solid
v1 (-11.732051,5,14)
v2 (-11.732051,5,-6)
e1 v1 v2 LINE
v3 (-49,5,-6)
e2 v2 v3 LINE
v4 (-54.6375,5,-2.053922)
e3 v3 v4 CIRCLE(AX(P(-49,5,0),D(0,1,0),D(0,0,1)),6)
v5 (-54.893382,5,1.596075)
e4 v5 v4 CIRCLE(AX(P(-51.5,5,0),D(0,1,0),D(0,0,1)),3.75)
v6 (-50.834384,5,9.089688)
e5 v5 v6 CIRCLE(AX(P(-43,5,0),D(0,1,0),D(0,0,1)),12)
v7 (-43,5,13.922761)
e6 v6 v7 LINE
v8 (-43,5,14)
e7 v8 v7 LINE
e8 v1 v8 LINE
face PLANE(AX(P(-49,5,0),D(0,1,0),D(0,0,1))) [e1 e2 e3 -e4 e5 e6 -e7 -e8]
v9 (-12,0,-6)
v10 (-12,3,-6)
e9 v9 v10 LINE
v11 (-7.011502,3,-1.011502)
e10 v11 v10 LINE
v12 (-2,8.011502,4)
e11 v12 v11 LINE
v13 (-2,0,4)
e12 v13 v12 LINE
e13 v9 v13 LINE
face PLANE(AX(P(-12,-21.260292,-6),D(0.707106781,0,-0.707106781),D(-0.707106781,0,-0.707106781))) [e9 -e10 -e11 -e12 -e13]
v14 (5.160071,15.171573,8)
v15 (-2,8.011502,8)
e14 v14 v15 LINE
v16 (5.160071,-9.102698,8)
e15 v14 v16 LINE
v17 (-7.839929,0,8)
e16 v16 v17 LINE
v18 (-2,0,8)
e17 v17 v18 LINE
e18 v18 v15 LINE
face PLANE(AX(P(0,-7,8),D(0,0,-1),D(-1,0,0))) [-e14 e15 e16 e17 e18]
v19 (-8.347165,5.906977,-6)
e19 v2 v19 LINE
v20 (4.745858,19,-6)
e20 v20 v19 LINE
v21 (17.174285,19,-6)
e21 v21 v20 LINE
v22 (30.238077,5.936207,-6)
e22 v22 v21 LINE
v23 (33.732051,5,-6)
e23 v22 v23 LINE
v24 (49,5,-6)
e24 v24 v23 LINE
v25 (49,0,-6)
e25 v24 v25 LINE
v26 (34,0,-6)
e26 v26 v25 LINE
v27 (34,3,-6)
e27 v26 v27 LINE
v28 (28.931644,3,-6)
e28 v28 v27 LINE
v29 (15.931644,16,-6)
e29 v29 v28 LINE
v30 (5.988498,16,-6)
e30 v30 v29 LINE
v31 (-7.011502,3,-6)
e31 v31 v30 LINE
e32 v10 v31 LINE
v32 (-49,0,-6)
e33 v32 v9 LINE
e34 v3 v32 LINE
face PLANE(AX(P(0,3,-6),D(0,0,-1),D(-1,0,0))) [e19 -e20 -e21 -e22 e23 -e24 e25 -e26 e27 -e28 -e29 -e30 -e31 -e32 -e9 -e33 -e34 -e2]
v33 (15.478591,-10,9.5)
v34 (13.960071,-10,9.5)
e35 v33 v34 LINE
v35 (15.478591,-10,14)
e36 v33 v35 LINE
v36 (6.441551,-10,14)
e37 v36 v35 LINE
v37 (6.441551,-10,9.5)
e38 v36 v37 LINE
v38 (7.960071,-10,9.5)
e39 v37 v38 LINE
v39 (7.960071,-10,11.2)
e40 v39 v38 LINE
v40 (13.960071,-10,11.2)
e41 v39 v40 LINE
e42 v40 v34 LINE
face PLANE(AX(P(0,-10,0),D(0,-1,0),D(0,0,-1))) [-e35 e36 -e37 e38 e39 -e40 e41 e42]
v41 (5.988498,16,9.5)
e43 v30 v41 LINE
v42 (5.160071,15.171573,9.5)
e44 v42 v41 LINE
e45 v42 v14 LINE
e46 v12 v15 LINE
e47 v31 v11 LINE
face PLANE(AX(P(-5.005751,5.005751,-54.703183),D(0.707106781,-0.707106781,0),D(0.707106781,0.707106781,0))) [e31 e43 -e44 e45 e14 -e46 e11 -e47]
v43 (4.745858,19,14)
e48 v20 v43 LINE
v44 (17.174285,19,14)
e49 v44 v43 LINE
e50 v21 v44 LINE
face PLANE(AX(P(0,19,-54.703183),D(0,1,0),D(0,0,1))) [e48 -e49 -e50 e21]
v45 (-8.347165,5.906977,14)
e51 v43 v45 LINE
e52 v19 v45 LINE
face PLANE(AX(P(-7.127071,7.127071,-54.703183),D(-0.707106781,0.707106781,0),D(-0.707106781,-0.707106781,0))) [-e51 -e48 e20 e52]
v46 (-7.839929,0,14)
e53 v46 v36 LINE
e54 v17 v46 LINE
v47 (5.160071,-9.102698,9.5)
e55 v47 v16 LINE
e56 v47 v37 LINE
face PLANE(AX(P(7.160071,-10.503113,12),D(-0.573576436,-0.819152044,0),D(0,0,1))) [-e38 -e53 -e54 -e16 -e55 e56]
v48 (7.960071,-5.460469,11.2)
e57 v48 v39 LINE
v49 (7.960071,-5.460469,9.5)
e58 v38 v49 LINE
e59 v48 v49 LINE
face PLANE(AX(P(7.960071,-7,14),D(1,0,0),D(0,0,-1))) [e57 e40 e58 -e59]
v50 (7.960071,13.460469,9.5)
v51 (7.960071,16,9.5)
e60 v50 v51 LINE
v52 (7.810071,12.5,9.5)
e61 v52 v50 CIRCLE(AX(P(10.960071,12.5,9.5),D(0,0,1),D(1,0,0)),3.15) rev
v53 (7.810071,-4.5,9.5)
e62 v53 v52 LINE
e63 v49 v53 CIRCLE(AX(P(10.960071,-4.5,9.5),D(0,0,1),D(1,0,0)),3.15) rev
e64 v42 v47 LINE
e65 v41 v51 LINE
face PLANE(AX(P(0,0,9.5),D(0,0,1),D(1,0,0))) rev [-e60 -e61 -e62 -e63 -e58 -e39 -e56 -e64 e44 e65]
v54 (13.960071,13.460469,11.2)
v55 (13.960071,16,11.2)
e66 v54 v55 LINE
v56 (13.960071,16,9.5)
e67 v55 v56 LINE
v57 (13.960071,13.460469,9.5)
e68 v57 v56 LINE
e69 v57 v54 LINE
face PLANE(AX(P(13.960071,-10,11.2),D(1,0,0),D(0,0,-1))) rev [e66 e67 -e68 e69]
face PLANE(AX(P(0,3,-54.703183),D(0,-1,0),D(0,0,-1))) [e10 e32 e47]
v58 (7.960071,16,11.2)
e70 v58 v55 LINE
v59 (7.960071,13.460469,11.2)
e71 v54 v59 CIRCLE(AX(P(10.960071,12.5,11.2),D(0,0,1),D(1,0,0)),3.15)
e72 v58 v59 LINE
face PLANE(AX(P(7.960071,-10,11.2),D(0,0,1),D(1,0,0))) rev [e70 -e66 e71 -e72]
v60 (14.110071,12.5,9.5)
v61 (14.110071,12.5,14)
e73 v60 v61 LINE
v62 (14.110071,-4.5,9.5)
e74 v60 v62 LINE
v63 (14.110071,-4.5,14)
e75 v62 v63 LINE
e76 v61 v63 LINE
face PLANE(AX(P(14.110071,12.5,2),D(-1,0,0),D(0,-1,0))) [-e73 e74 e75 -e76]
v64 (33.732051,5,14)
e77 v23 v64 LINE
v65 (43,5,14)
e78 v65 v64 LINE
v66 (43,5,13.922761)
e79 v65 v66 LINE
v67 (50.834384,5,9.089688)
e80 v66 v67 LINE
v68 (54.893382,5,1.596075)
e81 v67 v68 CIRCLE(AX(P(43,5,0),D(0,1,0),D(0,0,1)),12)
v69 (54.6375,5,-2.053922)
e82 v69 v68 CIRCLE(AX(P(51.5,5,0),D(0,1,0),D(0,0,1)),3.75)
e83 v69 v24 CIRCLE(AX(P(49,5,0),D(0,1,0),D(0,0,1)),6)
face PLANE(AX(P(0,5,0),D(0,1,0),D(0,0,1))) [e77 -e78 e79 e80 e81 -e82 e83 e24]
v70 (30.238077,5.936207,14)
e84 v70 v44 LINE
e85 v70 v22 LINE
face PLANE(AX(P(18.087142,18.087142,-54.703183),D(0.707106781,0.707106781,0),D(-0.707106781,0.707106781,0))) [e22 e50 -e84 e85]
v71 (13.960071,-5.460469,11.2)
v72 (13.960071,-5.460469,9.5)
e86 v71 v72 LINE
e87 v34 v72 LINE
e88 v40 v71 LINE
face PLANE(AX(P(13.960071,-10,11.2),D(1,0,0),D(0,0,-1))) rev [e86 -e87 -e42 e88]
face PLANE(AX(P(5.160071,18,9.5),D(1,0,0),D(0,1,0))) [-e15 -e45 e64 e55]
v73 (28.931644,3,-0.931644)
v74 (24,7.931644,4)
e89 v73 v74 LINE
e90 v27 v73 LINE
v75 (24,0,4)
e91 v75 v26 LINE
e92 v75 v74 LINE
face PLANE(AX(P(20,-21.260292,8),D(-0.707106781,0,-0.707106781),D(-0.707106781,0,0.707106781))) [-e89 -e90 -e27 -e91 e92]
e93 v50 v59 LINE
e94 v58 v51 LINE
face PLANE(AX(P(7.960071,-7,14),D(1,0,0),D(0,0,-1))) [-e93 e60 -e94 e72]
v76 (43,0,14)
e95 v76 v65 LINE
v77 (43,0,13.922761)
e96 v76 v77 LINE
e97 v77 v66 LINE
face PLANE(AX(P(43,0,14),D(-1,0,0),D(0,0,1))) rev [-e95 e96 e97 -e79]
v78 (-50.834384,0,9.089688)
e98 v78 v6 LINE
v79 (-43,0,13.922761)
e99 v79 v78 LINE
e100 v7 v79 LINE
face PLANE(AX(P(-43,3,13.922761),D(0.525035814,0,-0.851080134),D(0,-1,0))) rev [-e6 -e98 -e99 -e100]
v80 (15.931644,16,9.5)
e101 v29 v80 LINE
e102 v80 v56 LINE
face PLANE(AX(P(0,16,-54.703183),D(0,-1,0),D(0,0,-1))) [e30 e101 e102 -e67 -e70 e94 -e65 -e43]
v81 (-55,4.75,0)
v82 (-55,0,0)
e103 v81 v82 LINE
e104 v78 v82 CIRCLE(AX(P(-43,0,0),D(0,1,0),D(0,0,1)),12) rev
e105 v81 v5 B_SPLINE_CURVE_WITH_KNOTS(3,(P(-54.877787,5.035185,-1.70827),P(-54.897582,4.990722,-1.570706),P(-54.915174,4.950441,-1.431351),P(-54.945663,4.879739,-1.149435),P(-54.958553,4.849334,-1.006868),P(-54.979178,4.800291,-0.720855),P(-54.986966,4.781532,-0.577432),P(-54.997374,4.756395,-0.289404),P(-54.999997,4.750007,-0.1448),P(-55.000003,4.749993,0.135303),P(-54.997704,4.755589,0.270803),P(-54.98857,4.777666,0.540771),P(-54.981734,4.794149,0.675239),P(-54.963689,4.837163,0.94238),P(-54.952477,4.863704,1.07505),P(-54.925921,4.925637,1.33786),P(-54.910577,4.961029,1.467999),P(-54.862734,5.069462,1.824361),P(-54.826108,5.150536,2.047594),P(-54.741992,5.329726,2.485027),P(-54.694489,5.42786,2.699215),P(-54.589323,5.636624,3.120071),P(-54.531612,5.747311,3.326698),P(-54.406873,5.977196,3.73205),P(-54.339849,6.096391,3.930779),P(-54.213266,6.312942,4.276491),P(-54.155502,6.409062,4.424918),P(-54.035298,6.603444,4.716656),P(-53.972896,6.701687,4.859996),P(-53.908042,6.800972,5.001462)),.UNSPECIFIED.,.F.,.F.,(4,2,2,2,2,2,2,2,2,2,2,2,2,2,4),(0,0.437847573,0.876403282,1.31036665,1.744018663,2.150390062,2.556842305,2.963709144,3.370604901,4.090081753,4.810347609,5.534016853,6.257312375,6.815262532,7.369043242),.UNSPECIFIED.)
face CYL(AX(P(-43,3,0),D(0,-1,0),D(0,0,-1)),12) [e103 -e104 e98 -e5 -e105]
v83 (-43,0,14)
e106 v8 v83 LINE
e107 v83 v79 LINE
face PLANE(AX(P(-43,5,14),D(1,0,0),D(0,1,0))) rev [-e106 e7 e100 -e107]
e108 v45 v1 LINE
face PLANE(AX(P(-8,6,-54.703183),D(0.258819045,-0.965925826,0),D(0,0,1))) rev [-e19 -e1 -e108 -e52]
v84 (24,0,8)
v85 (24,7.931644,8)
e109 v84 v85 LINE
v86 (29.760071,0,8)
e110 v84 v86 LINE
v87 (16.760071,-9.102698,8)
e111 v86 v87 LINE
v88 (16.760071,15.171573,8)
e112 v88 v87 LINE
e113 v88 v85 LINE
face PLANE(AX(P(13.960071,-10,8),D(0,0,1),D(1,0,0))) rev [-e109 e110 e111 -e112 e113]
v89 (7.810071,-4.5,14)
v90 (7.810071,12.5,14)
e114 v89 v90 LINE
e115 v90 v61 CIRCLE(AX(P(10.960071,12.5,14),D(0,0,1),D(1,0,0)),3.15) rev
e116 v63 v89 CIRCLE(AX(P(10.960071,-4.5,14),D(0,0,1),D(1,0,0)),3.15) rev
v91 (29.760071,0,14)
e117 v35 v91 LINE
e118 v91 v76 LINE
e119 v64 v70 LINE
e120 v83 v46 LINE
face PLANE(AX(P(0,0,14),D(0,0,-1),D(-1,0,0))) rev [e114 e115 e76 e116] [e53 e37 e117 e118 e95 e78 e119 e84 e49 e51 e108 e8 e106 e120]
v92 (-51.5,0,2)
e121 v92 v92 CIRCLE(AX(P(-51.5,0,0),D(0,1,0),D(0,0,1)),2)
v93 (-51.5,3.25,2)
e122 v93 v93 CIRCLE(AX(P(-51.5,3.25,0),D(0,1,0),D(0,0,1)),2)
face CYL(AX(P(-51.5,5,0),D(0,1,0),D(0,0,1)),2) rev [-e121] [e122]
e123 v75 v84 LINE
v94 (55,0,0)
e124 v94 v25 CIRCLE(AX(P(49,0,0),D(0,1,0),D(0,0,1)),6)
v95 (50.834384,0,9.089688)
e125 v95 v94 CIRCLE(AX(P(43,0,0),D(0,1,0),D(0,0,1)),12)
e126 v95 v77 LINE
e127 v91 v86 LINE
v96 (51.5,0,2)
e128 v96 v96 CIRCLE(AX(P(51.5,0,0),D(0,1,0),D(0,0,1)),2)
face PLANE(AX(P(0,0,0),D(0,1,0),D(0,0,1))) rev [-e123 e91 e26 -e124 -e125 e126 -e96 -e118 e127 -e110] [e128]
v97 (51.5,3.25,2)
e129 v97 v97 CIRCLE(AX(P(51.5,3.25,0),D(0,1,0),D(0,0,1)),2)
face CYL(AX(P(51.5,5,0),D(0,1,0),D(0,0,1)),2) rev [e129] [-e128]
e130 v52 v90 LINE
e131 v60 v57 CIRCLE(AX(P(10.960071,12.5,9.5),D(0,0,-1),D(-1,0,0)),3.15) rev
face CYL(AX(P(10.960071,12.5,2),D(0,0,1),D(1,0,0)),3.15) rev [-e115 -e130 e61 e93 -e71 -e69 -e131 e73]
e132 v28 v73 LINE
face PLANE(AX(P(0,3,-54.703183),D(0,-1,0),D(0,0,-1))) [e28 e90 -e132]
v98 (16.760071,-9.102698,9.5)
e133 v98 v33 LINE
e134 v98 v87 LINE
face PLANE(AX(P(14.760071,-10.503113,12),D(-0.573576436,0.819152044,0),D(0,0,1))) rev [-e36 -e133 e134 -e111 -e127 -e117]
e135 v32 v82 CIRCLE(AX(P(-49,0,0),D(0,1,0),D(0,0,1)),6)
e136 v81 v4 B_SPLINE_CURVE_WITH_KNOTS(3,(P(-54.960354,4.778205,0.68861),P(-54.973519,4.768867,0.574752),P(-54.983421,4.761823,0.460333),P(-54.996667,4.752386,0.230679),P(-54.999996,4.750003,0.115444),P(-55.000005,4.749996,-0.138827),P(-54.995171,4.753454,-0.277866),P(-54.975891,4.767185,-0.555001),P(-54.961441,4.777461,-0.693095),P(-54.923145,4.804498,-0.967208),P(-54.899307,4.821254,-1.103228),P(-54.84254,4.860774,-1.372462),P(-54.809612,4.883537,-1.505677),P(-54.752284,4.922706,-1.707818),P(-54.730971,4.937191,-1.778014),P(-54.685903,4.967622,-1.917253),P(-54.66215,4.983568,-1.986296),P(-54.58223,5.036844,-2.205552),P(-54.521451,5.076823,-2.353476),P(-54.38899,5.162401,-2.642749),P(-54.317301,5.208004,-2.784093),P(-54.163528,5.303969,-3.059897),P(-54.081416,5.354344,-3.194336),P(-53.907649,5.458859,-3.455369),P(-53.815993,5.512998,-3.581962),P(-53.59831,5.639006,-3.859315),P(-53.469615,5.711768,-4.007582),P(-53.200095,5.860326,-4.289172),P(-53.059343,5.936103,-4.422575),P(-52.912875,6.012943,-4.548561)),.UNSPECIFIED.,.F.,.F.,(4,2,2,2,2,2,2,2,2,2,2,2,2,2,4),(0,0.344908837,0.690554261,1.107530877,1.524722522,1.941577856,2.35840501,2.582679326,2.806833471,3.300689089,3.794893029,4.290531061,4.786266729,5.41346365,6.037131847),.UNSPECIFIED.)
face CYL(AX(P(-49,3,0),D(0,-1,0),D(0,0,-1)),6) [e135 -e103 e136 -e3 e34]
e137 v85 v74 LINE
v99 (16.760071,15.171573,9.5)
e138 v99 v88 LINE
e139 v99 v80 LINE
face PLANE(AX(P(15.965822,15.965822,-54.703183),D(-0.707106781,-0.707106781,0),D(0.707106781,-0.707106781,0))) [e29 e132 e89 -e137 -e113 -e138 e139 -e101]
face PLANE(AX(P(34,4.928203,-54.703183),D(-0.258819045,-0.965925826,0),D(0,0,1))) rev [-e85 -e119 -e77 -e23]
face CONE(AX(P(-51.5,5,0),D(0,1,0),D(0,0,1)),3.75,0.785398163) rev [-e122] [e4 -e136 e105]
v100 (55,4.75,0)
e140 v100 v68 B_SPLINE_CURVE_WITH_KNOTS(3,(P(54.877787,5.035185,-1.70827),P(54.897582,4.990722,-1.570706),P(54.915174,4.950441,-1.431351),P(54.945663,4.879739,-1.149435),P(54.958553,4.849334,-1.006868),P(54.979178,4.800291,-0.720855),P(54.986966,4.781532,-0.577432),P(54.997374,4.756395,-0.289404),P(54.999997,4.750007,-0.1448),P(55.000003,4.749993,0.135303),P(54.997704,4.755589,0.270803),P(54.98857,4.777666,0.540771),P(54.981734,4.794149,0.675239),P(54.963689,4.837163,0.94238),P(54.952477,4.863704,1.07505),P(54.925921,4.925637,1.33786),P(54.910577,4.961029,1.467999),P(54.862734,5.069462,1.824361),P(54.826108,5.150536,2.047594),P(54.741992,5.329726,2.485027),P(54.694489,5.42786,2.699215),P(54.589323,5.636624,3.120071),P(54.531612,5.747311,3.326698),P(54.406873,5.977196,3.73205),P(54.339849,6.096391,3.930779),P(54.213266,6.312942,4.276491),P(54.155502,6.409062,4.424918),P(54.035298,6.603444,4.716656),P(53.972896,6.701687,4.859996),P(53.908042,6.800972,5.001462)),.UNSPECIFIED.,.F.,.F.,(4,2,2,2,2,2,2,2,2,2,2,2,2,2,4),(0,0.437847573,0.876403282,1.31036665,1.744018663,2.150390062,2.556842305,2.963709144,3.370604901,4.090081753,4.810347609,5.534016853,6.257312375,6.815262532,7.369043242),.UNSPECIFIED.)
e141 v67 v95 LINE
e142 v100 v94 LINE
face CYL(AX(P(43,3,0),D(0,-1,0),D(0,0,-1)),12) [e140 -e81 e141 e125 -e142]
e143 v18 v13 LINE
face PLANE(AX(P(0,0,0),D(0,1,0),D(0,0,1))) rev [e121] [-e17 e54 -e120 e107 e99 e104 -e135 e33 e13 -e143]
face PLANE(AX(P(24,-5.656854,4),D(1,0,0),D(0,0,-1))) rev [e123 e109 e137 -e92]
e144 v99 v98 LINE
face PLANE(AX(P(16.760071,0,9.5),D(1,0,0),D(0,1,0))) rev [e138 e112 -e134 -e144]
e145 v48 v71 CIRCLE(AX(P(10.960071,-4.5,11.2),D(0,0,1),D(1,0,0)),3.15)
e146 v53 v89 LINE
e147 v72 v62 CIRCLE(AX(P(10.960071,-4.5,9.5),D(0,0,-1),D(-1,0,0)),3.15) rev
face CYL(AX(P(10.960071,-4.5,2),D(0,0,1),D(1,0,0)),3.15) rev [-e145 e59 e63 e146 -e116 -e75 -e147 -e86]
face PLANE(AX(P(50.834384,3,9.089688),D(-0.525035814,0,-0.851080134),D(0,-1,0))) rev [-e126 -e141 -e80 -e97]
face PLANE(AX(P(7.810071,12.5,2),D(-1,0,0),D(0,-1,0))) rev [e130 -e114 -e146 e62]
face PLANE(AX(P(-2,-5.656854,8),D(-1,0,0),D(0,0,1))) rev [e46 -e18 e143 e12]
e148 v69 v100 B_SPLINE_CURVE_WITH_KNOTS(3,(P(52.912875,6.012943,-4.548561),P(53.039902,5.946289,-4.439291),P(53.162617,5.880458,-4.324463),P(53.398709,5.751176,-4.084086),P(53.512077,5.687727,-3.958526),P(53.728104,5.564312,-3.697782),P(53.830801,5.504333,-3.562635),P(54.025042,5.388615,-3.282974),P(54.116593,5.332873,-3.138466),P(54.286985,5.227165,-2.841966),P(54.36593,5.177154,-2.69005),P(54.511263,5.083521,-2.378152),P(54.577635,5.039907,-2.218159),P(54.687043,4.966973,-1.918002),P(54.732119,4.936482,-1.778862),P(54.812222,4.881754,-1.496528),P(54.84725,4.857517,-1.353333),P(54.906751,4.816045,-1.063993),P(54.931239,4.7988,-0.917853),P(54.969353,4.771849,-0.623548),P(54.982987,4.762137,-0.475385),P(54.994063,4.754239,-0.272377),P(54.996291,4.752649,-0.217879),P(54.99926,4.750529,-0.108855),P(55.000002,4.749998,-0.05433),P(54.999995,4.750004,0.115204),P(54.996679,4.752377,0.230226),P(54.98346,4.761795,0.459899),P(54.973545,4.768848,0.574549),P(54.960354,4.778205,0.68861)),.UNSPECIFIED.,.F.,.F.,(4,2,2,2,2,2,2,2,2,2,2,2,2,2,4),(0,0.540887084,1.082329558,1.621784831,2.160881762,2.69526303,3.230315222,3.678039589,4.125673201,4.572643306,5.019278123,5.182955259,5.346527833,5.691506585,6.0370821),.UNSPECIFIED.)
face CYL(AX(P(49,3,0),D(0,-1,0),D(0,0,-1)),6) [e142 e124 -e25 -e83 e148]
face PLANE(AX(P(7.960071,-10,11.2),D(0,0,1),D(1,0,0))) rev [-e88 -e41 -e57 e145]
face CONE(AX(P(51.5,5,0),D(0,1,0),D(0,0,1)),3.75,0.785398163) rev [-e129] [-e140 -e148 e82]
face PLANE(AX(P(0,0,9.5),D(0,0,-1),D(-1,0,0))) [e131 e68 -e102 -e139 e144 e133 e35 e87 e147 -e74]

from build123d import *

# Parameters (mm, degrees)
BOSS_EXTRUDE1_DEPTH           = 3
CUT_EXTRUDE1_DEPTH            = 10
CUT_EXTRUDE3_START            = 8
SKETCH8_W                     = 6
SKETCH8_H                     = 3
CUT_EXTRUDE3_DEPTH            = 6
BOSS_EXTRUDE4_START           = 18
BOSS_EXTRUDE4_DEPTH           = 28
BOSS_EXTRUDE5_DEPTH           = 3
CUT_EXTRUDE4_DEPTH            = 3
CUT_EXTRUDE5_DEPTH            = 10
SKETCH18_R                    = 1.5
BOSS_EXTRUDE9_DEPTH           = 2
CHAMFER1_SIZE                 = 15
CHAMFER2_SIZE                 = 15
CHAMFER2_SIZE_2               = 10.503113073
CUT_EXTRUDE6_DEPTH            = 5
BOSS_EXTRUDE8_DEPTH           = 2
CHAMFER3_DEPTH                = 6
CHAMFER3_2_DEPTH              = 5
CSK_FOR_M4_SFHCS1_D           = 4
CSK_FOR_M4_SFHCS1_DEPTH       = 30.798278762
CSK_FOR_M4_SFHCS1_CSINK_D     = 7.5
CSK_FOR_M4_SFHCS1_CSINK_ANGLE = 90
CSK_FOR_M4_SFHCS1_TIP         = 1.201721238
CUT_EXTRUDE7_DEPTH            = 1.5
BOSS_EXTRUDE10_START          = -6
BOSS_EXTRUDE10_DEPTH          = 20
CHAMFER4_SIZE                 = 1.07179677
CHAMFER4_SIZE_2               = 4


with BuildPart() as part:
    # Sketch1 → Boss-Extrude1 (new body)
    with BuildSketch(Plane(origin=(0, 0, 0), x_dir=(1, 0, 0), z_dir=(0, 1, 0))):
        with BuildLine():
            ThreePointArc((-49, -6), (-53.242640687, -4.242640687), (-55, 0))
            ThreePointArc((-55, 0), (-51.485281374, -8.485281374), (-43, -12))
            Line((-43, -12), (43, -12))
            ThreePointArc((43, -12), (51.485281374, -8.485281374), (55, 0))
            ThreePointArc((55, 0), (53.242640687, -4.242640687), (49, -6))
            Line((49, -6), (-49, -6))
        make_face()
        with BuildLine():
            Line((-53, 0), (-55, 0))
            ThreePointArc((-55, 0), (-53.242640687, -4.242640687), (-49, -6))
            Line((-49, -6), (49, -6))
            ThreePointArc((49, -6), (53.242640687, -4.242640687), (55, 0))
            Line((55, 0), (53, 0))
            ThreePointArc((53, 0), (51.5, -1.5), (50, 0))
            Line((50, 0), (-50, 0))
            ThreePointArc((-50, 0), (-51.5, -1.5), (-53, 0))
        make_face()
        with BuildLine():
            Line((49, 6), (-49, 6))
            ThreePointArc((-49, 6), (-53.242640687, 4.242640687), (-55, 0))
            Line((-55, 0), (-53, 0))
            ThreePointArc((-53, 0), (-51.5, 1.5), (-50, 0))
            Line((-50, 0), (50, 0))
            ThreePointArc((50, 0), (51.5, 1.5), (53, 0))
            Line((53, 0), (55, 0))
            ThreePointArc((55, 0), (53.242640687, 4.242640687), (49, 6))
        make_face()
    extrude(amount=BOSS_EXTRUDE1_DEPTH)

    # Sketch2 → Cut-Extrude1 (cut)
    with BuildSketch(Plane(origin=(0, 3, 0), x_dir=(1, 0, 0), z_dir=(0, 1, 0))):
        Polygon((22, -8), (36, 6), (-14, 6), (0, -8), align=None)
    extrude(amount=-CUT_EXTRUDE1_DEPTH, mode=Mode.SUBTRACT)

    # Sketch8 → Cut-Extrude3 (cut)
    with BuildSketch(Plane.XY.offset(CUT_EXTRUDE3_START)):
        with Locations((10.960071178, 1.5)):
            Rectangle(SKETCH8_W, SKETCH8_H)
    extrude(amount=CUT_EXTRUDE3_DEPTH, mode=Mode.SUBTRACT)


with BuildPart() as cut_extrude3_piece_1:
    # of the separate pieces the step leaves, piece 1, a body of its own (cut_extrude3_pieces)
    add(part.part.solids().sort_by_distance((-55, 0, 0))[0])

    # Sketch9 → Boss-Extrude4 (add)
    with BuildSketch(Plane(origin=(0, 0, 0), x_dir=(1, 0, 0), z_dir=(0, 1, 0)).offset(BOSS_EXTRUDE4_START)):
        Polygon((13.960071178, -11.2), (13.960071178, -8), (14.760071178, -8), (14.760071178, -12), (7.160071178, -12), (7.160071178, -8), (7.960071178, -8), (7.960071178, -11.2), align=None)
    extrude(amount=-BOSS_EXTRUDE4_DEPTH)


with BuildPart() as cut_extrude3_piece_2:
    # of the separate pieces the step leaves, piece 2, a body of its own (cut_extrude3_pieces)
    add(part.part.solids().sort_by_distance((13.960071178, 0, 12))[0])


with BuildPart() as cut_extrude3_piece_1_1:
    add(cut_extrude3_piece_1.part)

    # Combine1: union Cut-Extrude3 piece 2
    add(cut_extrude3_piece_2.part)

    # Sketch11 → Boss-Extrude5 (add)
    with BuildSketch(Plane(origin=(0, 3, 0), x_dir=(1, 0, 0), z_dir=(0, 1, 0))):
        Polygon((-14, 6), (-12, 6), (2, -8), (0, -8), align=None)
        Polygon((20, -8), (34, 6), (36, 6), (22, -8), align=None)
    extrude(amount=-BOSS_EXTRUDE5_DEPTH)

    # Sketch13 → Cut-Extrude4 (cut)
    with BuildSketch(Plane(origin=(0, 3, 0), x_dir=(1, 0, 0), z_dir=(0, 1, 0))):
        Polygon((2, -8), (-2, -8), (-2, -4), align=None)
        Polygon((24, -4), (24, -8), (20, -8), align=None)
    extrude(amount=-CUT_EXTRUDE4_DEPTH, mode=Mode.SUBTRACT)

    # Sketch15 → Cut-Extrude5 (cut)
    with BuildSketch(Plane.XY.offset(12)):
        with BuildLine():
            Line((14.110071178, 12.5), (14.110071178, -4.5))
            ThreePointArc((14.110071178, -4.5), (10.960071178, -7.65), (7.810071178, -4.5))
            Line((7.810071178, -4.5), (7.810071178, 12.5))
            ThreePointArc((7.810071178, 12.5), (10.960071178, 15.65), (14.110071178, 12.5))
        make_face()
    extrude(amount=-CUT_EXTRUDE5_DEPTH, mode=Mode.SUBTRACT)

    # Sketch18 → Boss-Extrude9 (add)
    # profile 1 of 2: a face of its own
    with BuildSketch(Plane(origin=(0, 3, 0), x_dir=(1, 0, 0), z_dir=(0, 1, 0))):
        with BuildLine():
            Line((7.160071178, -8), (-2, -8))
            Line((-2, -8), (-2, -4))
            Line((-2, -4), (-12, 6))
            Line((-12, 6), (-49, 6))
            ThreePointArc((-49, 6), (-53.242640687, 4.242640687), (-55, 0))
            ThreePointArc((-55, 0), (-51.485281374, -8.485281374), (-43, -12))
            Line((-43, -12), (7.160071178, -12))
            Line((7.160071178, -12), (7.160071178, -8))
        make_face()
        with Locations(Location((-51.5, 0, 0), (0, 0, 270))):
            Circle(SKETCH18_R, mode=Mode.SUBTRACT)
    # profile 2 of 2: a face of its own
    with BuildSketch(Plane(origin=(0, 3, 0), x_dir=(1, 0, 0), z_dir=(0, 1, 0))):
        with BuildLine():
            Line((24, -4), (24, -8))
            Line((24, -8), (14.760071178, -8))
            Line((14.760071178, -8), (14.760071178, -12))
            Line((14.760071178, -12), (43, -12))
            ThreePointArc((43, -12), (51.485281374, -8.485281374), (55, 0))
            ThreePointArc((55, 0), (53.242640687, 4.242640687), (49, 6))
            Line((49, 6), (34, 6))
            Line((34, 6), (24, -4))
        make_face()
        with Locations(Location((51.5, 0, 0), (0, 0, 270))):
            Circle(SKETCH18_R, mode=Mode.SUBTRACT)
    extrude(amount=BOSS_EXTRUDE9_DEPTH)

    # Chamfer1
    # the kernel refuses this chamfer: 15 mm, written as the material it adds along each edge
    with BuildSketch(Plane(origin=(14.760071178, 5, 8), x_dir=(0, 1, 0), z_dir=(0, 0, 1))) as chamfer1_piece_1_section:
        Polygon((CHAMFER1_SIZE, 0), (0, -CHAMFER1_SIZE), (0, 0), align=None)
    chamfer1_piece_1 = extrude(amount=4, mode=Mode.PRIVATE)
    chamfer1_piece_1 = split(chamfer1_piece_1, bisect_by=Plane(origin=(14.760071178, 18, 8), z_dir=(0, -1, 0)), keep=Keep.TOP, mode=Mode.PRIVATE)
    chamfer1_piece_1 = split(chamfer1_piece_1, bisect_by=Plane(origin=(17.380035589, 5, 10.619964411), z_dir=(-0.7071067811865474, 0, -0.7071067811865477)), keep=Keep.TOP, mode=Mode.PRIVATE)
    add(chamfer1_piece_1)
    with BuildSketch(Plane(origin=(14.760071178, 5, -30.575244819), x_dir=(0, 1, 0), z_dir=(0, 0, 1))) as chamfer1_piece_2_section:
        Polygon((CHAMFER1_SIZE, 0), (0, -CHAMFER1_SIZE), (0, 0), align=None)
    chamfer1_piece_2 = extrude(amount=42.575244819, mode=Mode.PRIVATE)
    chamfer1_piece_2 = split(chamfer1_piece_2, bisect_by=Plane(origin=(14.760071178, 5, 8), z_dir=(0, 0, -1)), keep=Keep.TOP, mode=Mode.PRIVATE)
    chamfer1_piece_2 = split(chamfer1_piece_2, bisect_by=Plane(origin=(36.667657999, 5, -8.667657999), z_dir=(0.7071067811865474, 0, 0.7071067811865477)), keep=Keep.TOP, mode=Mode.PRIVATE)
    chamfer1_piece_2 = split(chamfer1_piece_2, bisect_by=Plane(origin=(24, 5, -30.575244819), z_dir=(1, 0, 0)), keep=Keep.TOP, mode=Mode.PRIVATE)
    add(chamfer1_piece_2)
    with BuildSketch(Plane(origin=(14.760071178, 5, 8), x_dir=(0, 1, 0), z_dir=(0, 0, 1))) as chamfer1_piece_3_section:
        Polygon((CHAMFER1_SIZE, 0), (0, -CHAMFER1_SIZE), (0, 0), align=None)
    chamfer1_piece_3 = extrude(amount=4, mode=Mode.PRIVATE)
    chamfer1_piece_3 = split(chamfer1_piece_3, bisect_by=Plane(origin=(14.760071178, 18, 8), z_dir=(0, -1, 0)), keep=Keep.TOP, mode=Mode.PRIVATE)
    chamfer1_piece_3 = split(chamfer1_piece_3, bisect_by=Plane(origin=(17.380035589, 5, 10.619964411), z_dir=(0.7071067811865474, 0, 0.7071067811865477)), keep=Keep.TOP, mode=Mode.PRIVATE)
    chamfer1_piece_3 = split(chamfer1_piece_3, bisect_by=Plane(origin=(24, 5, 8), z_dir=(-1, 0, 0)), keep=Keep.TOP, mode=Mode.PRIVATE)
    add(chamfer1_piece_3)
    with BuildSketch(Plane(origin=(14.760071178, 5, 8), x_dir=(0, 1, 0), z_dir=(0, 0, 1))) as chamfer1_piece_4_section:
        Polygon((CHAMFER1_SIZE, 0), (0, -CHAMFER1_SIZE), (0, 0), align=None)
    chamfer1_piece_4 = extrude(amount=4, mode=Mode.PRIVATE)
    chamfer1_piece_4 = split(chamfer1_piece_4, bisect_by=Plane(origin=(24, 5, 8), z_dir=(1, 0, 0)), keep=Keep.TOP, mode=Mode.PRIVATE)
    add(chamfer1_piece_4)
    with BuildSketch(Plane(origin=(7.160071178, 5, 12), x_dir=(0, 1, 0), z_dir=(0, 0, -1))) as chamfer1_piece_5_section:
        Polygon((CHAMFER1_SIZE, 0), (0, -CHAMFER1_SIZE), (0, 0), align=None)
    chamfer1_piece_5 = extrude(amount=4, mode=Mode.PRIVATE)
    chamfer1_piece_5 = split(chamfer1_piece_5, bisect_by=Plane(origin=(6.580035589, 5, 12.580035589), z_dir=(-0.7071067811865489, 0, 0.7071067811865461)), keep=Keep.TOP, mode=Mode.PRIVATE)
    chamfer1_piece_5 = split(chamfer1_piece_5, bisect_by=Plane(origin=(-2, 5, 12), z_dir=(1, 0, 0)), keep=Keep.TOP, mode=Mode.PRIVATE)
    chamfer1_piece_5 = split(chamfer1_piece_5, bisect_by=Plane(origin=(7.160071178, 18, 12), z_dir=(0, -1, 0)), keep=Keep.TOP, mode=Mode.PRIVATE)
    add(chamfer1_piece_5)
    with BuildSketch(Plane(origin=(7.160071178, 5, 12), x_dir=(0, 1, 0), z_dir=(0, 0, -1))) as chamfer1_piece_6_section:
        Polygon((CHAMFER1_SIZE, 0), (0, -CHAMFER1_SIZE), (0, 0), align=None)
    chamfer1_piece_6 = extrude(amount=4, mode=Mode.PRIVATE)
    chamfer1_piece_6 = split(chamfer1_piece_6, bisect_by=Plane(origin=(-2, 5, 12), z_dir=(-1, 0, 0)), keep=Keep.TOP, mode=Mode.PRIVATE)
    add(chamfer1_piece_6)
    with BuildSketch(Plane(origin=(7.160071178, 5, 12), x_dir=(0, 1, 0), z_dir=(0, 0, -1))) as chamfer1_piece_7_section:
        Polygon((CHAMFER1_SIZE, 0), (0, -CHAMFER1_SIZE), (0, 0), align=None)
    chamfer1_piece_7 = extrude(amount=4, mode=Mode.PRIVATE)
    chamfer1_piece_7 = split(chamfer1_piece_7, bisect_by=Plane(origin=(6.580035589, 5, 12.580035589), z_dir=(0.7071067811865489, 0, -0.7071067811865461)), keep=Keep.TOP, mode=Mode.PRIVATE)
    chamfer1_piece_7 = split(chamfer1_piece_7, bisect_by=Plane(origin=(7.160071178, 18, 12), z_dir=(0, -1, 0)), keep=Keep.TOP, mode=Mode.PRIVATE)
    add(chamfer1_piece_7)
    with BuildSketch(Plane(origin=(7.160071178, 5, 12), x_dir=(0, 1, 0), z_dir=(0, 0, -1))) as chamfer1_piece_8_section:
        Polygon((CHAMFER1_SIZE, 0), (0, -CHAMFER1_SIZE), (0, 0), align=None)
    chamfer1_piece_8 = extrude(amount=42.575244819, mode=Mode.PRIVATE)
    chamfer1_piece_8 = split(chamfer1_piece_8, bisect_by=Plane(origin=(6.580035589, 5, 12.580035589), z_dir=(-0.7071067811865489, 0, 0.7071067811865461)), keep=Keep.TOP, mode=Mode.PRIVATE)
    chamfer1_piece_8 = split(chamfer1_piece_8, bisect_by=Plane(origin=(-2, 5, 12), z_dir=(-1, 0, 0)), keep=Keep.TOP, mode=Mode.PRIVATE)
    chamfer1_piece_8 = split(chamfer1_piece_8, bisect_by=Plane(origin=(7.160071178, 5, 8), z_dir=(0, 0, -1)), keep=Keep.TOP, mode=Mode.PRIVATE)
    add(chamfer1_piece_8)

    # Chamfer2
    # the kernel refuses this chamfer: 15, 10.503113073 mm, written as the material it adds along each edge
    with BuildSketch(Plane(origin=(7.160071178, 0, 12), x_dir=(-1, 0, 0), z_dir=(0, 0, -1))) as chamfer2_piece_1_section:
        Polygon((CHAMFER2_SIZE, 0), (0, -CHAMFER2_SIZE_2), (0, 0), align=None)
    chamfer2_piece_1 = extrude(amount=4, mode=Mode.PRIVATE)
    chamfer2_piece_1 = split(chamfer2_piece_1, bisect_by=Plane(origin=(-2, 0, 12), z_dir=(-1, 0, 0)), keep=Keep.TOP, mode=Mode.PRIVATE)
    add(chamfer2_piece_1)
    with BuildSketch(Plane(origin=(7.160071178, 0, 12), x_dir=(-1, 0, 0), z_dir=(0, 0, -1))) as chamfer2_piece_2_section:
        Polygon((CHAMFER2_SIZE, 0), (0, -CHAMFER2_SIZE_2), (0, 0), align=None)
    chamfer2_piece_2 = extrude(amount=4, mode=Mode.PRIVATE)
    chamfer2_piece_2 = split(chamfer2_piece_2, bisect_by=Plane(origin=(6.580035589, 0, 12.580035589), z_dir=(-0.7071067811865476, 0, 0.7071067811865476)), keep=Keep.TOP, mode=Mode.PRIVATE)
    chamfer2_piece_2 = split(chamfer2_piece_2, bisect_by=Plane(origin=(-2, 0, 12), z_dir=(1, 0, 0)), keep=Keep.TOP, mode=Mode.PRIVATE)
    add(chamfer2_piece_2)
    with BuildSketch(Plane(origin=(7.160071178, 0, 12), x_dir=(-1, 0, 0), z_dir=(0, 0, -1))) as chamfer2_piece_3_section:
        Polygon((CHAMFER2_SIZE, 0), (0, -CHAMFER2_SIZE_2), (0, 0), align=None)
    chamfer2_piece_3 = extrude(amount=42.738283454, mode=Mode.PRIVATE)
    chamfer2_piece_3 = split(chamfer2_piece_3, bisect_by=Plane(origin=(6.580035589, 0, 12.580035589), z_dir=(-0.7071067811865476, 0, 0.7071067811865476)), keep=Keep.TOP, mode=Mode.PRIVATE)
    chamfer2_piece_3 = split(chamfer2_piece_3, bisect_by=Plane(origin=(7.160071178, 0, 8), z_dir=(0, 0, -1)), keep=Keep.TOP, mode=Mode.PRIVATE)
    chamfer2_piece_3 = split(chamfer2_piece_3, bisect_by=Plane(origin=(-2, 0, 12), z_dir=(-1, 0, 0)), keep=Keep.TOP, mode=Mode.PRIVATE)
    add(chamfer2_piece_3)
    with BuildSketch(Plane(origin=(7.160071178, 0, 12), x_dir=(-1, 0, 0), z_dir=(0, 0, -1))) as chamfer2_piece_4_section:
        Polygon((CHAMFER2_SIZE, 0), (0, -CHAMFER2_SIZE_2), (0, 0), align=None)
    chamfer2_piece_4 = extrude(amount=4, mode=Mode.PRIVATE)
    chamfer2_piece_4 = split(chamfer2_piece_4, bisect_by=Plane(origin=(6.580035589, 0, 12.580035589), z_dir=(0.7071067811865476, 0, -0.7071067811865476)), keep=Keep.TOP, mode=Mode.PRIVATE)
    chamfer2_piece_4 = split(chamfer2_piece_4, bisect_by=Plane(origin=(7.160071178, -10, 12), z_dir=(0, 1, 0)), keep=Keep.TOP, mode=Mode.PRIVATE)
    add(chamfer2_piece_4)
    with BuildSketch(Plane(origin=(14.760071178, 0, 12), x_dir=(0, -1, 0), z_dir=(0, 0, -1))) as chamfer2_piece_5_section:
        Polygon((CHAMFER2_SIZE_2, 0), (0, -CHAMFER2_SIZE), (0, 0), align=None)
    chamfer2_piece_5 = extrude(amount=4, mode=Mode.PRIVATE)
    chamfer2_piece_5 = split(chamfer2_piece_5, bisect_by=Plane(origin=(15.380035589, 0, 12.619964411), z_dir=(0.7071067811865476, 0, 0.7071067811865476)), keep=Keep.TOP, mode=Mode.PRIVATE)
    chamfer2_piece_5 = split(chamfer2_piece_5, bisect_by=Plane(origin=(24, 0, 12), z_dir=(-1, 0, 0)), keep=Keep.TOP, mode=Mode.PRIVATE)
    add(chamfer2_piece_5)
    with BuildSketch(Plane(origin=(14.760071178, 0, 12), x_dir=(0, -1, 0), z_dir=(0, 0, -1))) as chamfer2_piece_6_section:
        Polygon((CHAMFER2_SIZE_2, 0), (0, -CHAMFER2_SIZE), (0, 0), align=None)
    chamfer2_piece_6 = extrude(amount=4, mode=Mode.PRIVATE)
    chamfer2_piece_6 = split(chamfer2_piece_6, bisect_by=Plane(origin=(24, 0, 12), z_dir=(1, 0, 0)), keep=Keep.TOP, mode=Mode.PRIVATE)
    add(chamfer2_piece_6)
    with BuildSketch(Plane(origin=(14.760071178, 0, 12), x_dir=(0, -1, 0), z_dir=(0, 0, -1))) as chamfer2_piece_7_section:
        Polygon((CHAMFER2_SIZE_2, 0), (0, -CHAMFER2_SIZE), (0, 0), align=None)
    chamfer2_piece_7 = extrude(amount=4, mode=Mode.PRIVATE)
    chamfer2_piece_7 = split(chamfer2_piece_7, bisect_by=Plane(origin=(14.760071178, -10, 12), z_dir=(0, 1, 0)), keep=Keep.TOP, mode=Mode.PRIVATE)
    chamfer2_piece_7 = split(chamfer2_piece_7, bisect_by=Plane(origin=(15.380035589, 0, 12.619964411), z_dir=(-0.7071067811865476, 0, -0.7071067811865476)), keep=Keep.TOP, mode=Mode.PRIVATE)
    add(chamfer2_piece_7)
    with BuildSketch(Plane(origin=(14.760071178, 0, 12), x_dir=(0, -1, 0), z_dir=(0, 0, -1))) as chamfer2_piece_8_section:
        Polygon((CHAMFER2_SIZE_2, 0), (0, -CHAMFER2_SIZE), (0, 0), align=None)
    chamfer2_piece_8 = extrude(amount=42.738283454, mode=Mode.PRIVATE)
    chamfer2_piece_8 = split(chamfer2_piece_8, bisect_by=Plane(origin=(14.760071178, 0, 8), z_dir=(0, 0, -1)), keep=Keep.TOP, mode=Mode.PRIVATE)
    chamfer2_piece_8 = split(chamfer2_piece_8, bisect_by=Plane(origin=(15.380035589, 0, 12.619964411), z_dir=(0.7071067811865476, 0, 0.7071067811865476)), keep=Keep.TOP, mode=Mode.PRIVATE)
    chamfer2_piece_8 = split(chamfer2_piece_8, bisect_by=Plane(origin=(24, 0, 12), z_dir=(1, 0, 0)), keep=Keep.TOP, mode=Mode.PRIVATE)
    add(chamfer2_piece_8)

    # Sketch16 → Cut-Extrude6 (cut)
    with BuildSketch(Plane(origin=(0, 0, 0), x_dir=(1, 0, 0), z_dir=(0, 1, 0))):
        Polygon((-7.839928822, 1.839928822), (-2, -4), (-2, -8), (-7.839928822, -8), align=None)
        Polygon((24, -8), (24, -4), (29.760071178, 1.760071178), (29.760071178, -8), align=None)
    extrude(amount=-CUT_EXTRUDE6_DEPTH, mode=Mode.SUBTRACT)

    # Sketch17 → Boss-Extrude8 (add)
    with BuildSketch(Plane.XY.offset(12)):
        Polygon((6.441551245, -10), (15.47859111, -10), (29.760071178, 0), (43, 0), (43, 5), (29.760071178, 5), (16.760071178, 18), (5.160071178, 18), (-7.839928822, 5), (-43, 5), (-43, 0), (-7.839928822, 0), align=None)
        with BuildLine():
            Line((7.810071178, 12.5), (7.810071178, -4.5))
            ThreePointArc((7.810071178, -4.5), (10.960071178, -7.65), (14.110071178, -4.5))
            Line((14.110071178, -4.5), (14.110071178, 12.5))
            ThreePointArc((14.110071178, 12.5), (10.960071178, 15.65), (7.810071178, 12.5))
        make_face(mode=Mode.SUBTRACT)
    extrude(amount=BOSS_EXTRUDE8_DEPTH)

    # Chamfer3: read off the stored shape, not the designer's step
    # Chamfer3 outline → Chamfer3 (cut)
    with BuildSketch(Plane(origin=(0, 0, 0), x_dir=(1, 0, 0), z_dir=(0, 1, 0))):
        with BuildLine():
            ThreePointArc((47.608318931, -11.079864468), (49.300429772, -10.212961602), (50.834384089, -9.08968789))
            Line((50.834384089, -9.08968789), (47.608318931, -11.079864468))
        make_face()
        with BuildLine():
            ThreePointArc((-50.834384089, -9.08968789), (-49.300429772, -10.212961602), (-47.608318931, -11.079864468))
            Line((-47.608318931, -11.079864468), (-50.834384089, -9.08968789))
        make_face()
    extrude(amount=CHAMFER3_DEPTH, mode=Mode.SUBTRACT)

    # Chamfer3 2 outline → Chamfer3 2 (add)
    with BuildSketch(Plane(origin=(0, 0, 0), x_dir=(1, 0, 0), z_dir=(0, 1, 0))):
        with BuildLine():
            Line((43, -13.922760673), (47.608318931, -11.079864468))
            ThreePointArc((47.608318931, -11.079864468), (45.349641077, -11.767717995), (43, -12))
            Line((43, -12), (43, -13.922760673))
        make_face()
        with BuildLine():
            Line((-47.608318931, -11.079864468), (-43, -13.922760673))
            Line((-43, -13.922760673), (-43, -12))
            ThreePointArc((-43, -12), (-45.349641077, -11.767717995), (-47.608318931, -11.079864468))
        make_face()
    extrude(amount=CHAMFER3_2_DEPTH)

    # CSK for M4 SFHCS1
    with Locations(Plane(origin=(0, 5, 0), x_dir=(1, 0, 0), z_dir=(0, 1, 0))):
        with Locations((-51.5, 0), (51.5, 0)):
            CounterSinkHole(CSK_FOR_M4_SFHCS1_D / 2, CSK_FOR_M4_SFHCS1_CSINK_D / 2, depth=CSK_FOR_M4_SFHCS1_DEPTH, counter_sink_angle=CSK_FOR_M4_SFHCS1_CSINK_ANGLE)
            with Locations((0, 0, -(CSK_FOR_M4_SFHCS1_DEPTH + CSK_FOR_M4_SFHCS1_TIP / 2))):  # 118° drill point
                Cone(0, CSK_FOR_M4_SFHCS1_D / 2, CSK_FOR_M4_SFHCS1_TIP, mode=Mode.SUBTRACT)

    # Sketch21 → Cut-Extrude7 (cut)
    with BuildSketch(Plane(origin=(0, 0, 8), x_dir=(-1, 0, 0), z_dir=(0, 0, -1))):
        Polygon((-13.960071178, -10), (-13.960071178, 18), (-16.760071178, 18), (-16.760071178, -9.102697997), (-15.47859111, -10), align=None)
        Polygon((-7.960071178, -10), (-7.960071178, 18), (-5.160071178, 18), (-5.160071178, -9.102697997), (-6.441551245, -10), align=None)
    extrude(amount=-CUT_EXTRUDE7_DEPTH, mode=Mode.SUBTRACT)

    # Sketch22 → Boss-Extrude10 (add)
    with BuildSketch(Plane.XY.offset(BOSS_EXTRUDE10_START)):
        Polygon((34, 3), (28.931644053, 3), (15.931644053, 16), (5.988498302, 16), (-7.011501698, 3), (-12, 3), (-12, 6), (-8.254142385, 6), (4.745857615, 19), (17.17428474, 19), (30.17428474, 6), (34, 6), align=None)
    extrude(amount=BOSS_EXTRUDE10_DEPTH)

    # Chamfer4
    # the kernel refuses this chamfer: 4, 1.07179677 mm, written as the material it takes off along each edge
    with BuildSketch(Plane(origin=(-12, 6, -16.386886281), x_dir=(0, -1, 0), z_dir=(0, 0, 1))) as chamfer4_piece_1_section:
        Polygon((CHAMFER4_SIZE, 0), (0, CHAMFER4_SIZE_2), (0, 0), align=None)
    chamfer4_piece_1 = extrude(amount=40.773772562, mode=Mode.PRIVATE)
    chamfer4_piece_1 = split(chamfer4_piece_1, bisect_by=Plane(origin=(-12, 5, -16.386886281), z_dir=(0, 1, 0)), keep=Keep.TOP, mode=Mode.PRIVATE)
    chamfer4_piece_1 = split(chamfer4_piece_1, bisect_by=Plane(origin=(-10.127071192, 4.127071192, -16.386886281), z_dir=(-0.707106781186548, 0.7071067811865472, 0)), keep=Keep.TOP, mode=Mode.PRIVATE)
    add(chamfer4_piece_1, mode=Mode.SUBTRACT)
    with BuildSketch(Plane(origin=(34, 6, -16.386886281), x_dir=(-1, 0, 0), z_dir=(0, 0, 1))) as chamfer4_piece_2_section:
        Polygon((CHAMFER4_SIZE_2, 0), (0, CHAMFER4_SIZE), (0, 0), align=None)
    chamfer4_piece_2 = extrude(amount=40.773772562, mode=Mode.PRIVATE)
    chamfer4_piece_2 = split(chamfer4_piece_2, bisect_by=Plane(origin=(34, 5, -16.386886281), z_dir=(0, 1, 0)), keep=Keep.TOP, mode=Mode.PRIVATE)
    chamfer4_piece_2 = split(chamfer4_piece_2, bisect_by=Plane(origin=(32.08714237, 4.08714237, -16.386886281), z_dir=(0.7071067811865475, 0.7071067811865476, 0)), keep=Keep.TOP, mode=Mode.PRIVATE)
    add(chamfer4_piece_2, mode=Mode.SUBTRACT)


solid = cut_extrude3_piece_1_1.part
